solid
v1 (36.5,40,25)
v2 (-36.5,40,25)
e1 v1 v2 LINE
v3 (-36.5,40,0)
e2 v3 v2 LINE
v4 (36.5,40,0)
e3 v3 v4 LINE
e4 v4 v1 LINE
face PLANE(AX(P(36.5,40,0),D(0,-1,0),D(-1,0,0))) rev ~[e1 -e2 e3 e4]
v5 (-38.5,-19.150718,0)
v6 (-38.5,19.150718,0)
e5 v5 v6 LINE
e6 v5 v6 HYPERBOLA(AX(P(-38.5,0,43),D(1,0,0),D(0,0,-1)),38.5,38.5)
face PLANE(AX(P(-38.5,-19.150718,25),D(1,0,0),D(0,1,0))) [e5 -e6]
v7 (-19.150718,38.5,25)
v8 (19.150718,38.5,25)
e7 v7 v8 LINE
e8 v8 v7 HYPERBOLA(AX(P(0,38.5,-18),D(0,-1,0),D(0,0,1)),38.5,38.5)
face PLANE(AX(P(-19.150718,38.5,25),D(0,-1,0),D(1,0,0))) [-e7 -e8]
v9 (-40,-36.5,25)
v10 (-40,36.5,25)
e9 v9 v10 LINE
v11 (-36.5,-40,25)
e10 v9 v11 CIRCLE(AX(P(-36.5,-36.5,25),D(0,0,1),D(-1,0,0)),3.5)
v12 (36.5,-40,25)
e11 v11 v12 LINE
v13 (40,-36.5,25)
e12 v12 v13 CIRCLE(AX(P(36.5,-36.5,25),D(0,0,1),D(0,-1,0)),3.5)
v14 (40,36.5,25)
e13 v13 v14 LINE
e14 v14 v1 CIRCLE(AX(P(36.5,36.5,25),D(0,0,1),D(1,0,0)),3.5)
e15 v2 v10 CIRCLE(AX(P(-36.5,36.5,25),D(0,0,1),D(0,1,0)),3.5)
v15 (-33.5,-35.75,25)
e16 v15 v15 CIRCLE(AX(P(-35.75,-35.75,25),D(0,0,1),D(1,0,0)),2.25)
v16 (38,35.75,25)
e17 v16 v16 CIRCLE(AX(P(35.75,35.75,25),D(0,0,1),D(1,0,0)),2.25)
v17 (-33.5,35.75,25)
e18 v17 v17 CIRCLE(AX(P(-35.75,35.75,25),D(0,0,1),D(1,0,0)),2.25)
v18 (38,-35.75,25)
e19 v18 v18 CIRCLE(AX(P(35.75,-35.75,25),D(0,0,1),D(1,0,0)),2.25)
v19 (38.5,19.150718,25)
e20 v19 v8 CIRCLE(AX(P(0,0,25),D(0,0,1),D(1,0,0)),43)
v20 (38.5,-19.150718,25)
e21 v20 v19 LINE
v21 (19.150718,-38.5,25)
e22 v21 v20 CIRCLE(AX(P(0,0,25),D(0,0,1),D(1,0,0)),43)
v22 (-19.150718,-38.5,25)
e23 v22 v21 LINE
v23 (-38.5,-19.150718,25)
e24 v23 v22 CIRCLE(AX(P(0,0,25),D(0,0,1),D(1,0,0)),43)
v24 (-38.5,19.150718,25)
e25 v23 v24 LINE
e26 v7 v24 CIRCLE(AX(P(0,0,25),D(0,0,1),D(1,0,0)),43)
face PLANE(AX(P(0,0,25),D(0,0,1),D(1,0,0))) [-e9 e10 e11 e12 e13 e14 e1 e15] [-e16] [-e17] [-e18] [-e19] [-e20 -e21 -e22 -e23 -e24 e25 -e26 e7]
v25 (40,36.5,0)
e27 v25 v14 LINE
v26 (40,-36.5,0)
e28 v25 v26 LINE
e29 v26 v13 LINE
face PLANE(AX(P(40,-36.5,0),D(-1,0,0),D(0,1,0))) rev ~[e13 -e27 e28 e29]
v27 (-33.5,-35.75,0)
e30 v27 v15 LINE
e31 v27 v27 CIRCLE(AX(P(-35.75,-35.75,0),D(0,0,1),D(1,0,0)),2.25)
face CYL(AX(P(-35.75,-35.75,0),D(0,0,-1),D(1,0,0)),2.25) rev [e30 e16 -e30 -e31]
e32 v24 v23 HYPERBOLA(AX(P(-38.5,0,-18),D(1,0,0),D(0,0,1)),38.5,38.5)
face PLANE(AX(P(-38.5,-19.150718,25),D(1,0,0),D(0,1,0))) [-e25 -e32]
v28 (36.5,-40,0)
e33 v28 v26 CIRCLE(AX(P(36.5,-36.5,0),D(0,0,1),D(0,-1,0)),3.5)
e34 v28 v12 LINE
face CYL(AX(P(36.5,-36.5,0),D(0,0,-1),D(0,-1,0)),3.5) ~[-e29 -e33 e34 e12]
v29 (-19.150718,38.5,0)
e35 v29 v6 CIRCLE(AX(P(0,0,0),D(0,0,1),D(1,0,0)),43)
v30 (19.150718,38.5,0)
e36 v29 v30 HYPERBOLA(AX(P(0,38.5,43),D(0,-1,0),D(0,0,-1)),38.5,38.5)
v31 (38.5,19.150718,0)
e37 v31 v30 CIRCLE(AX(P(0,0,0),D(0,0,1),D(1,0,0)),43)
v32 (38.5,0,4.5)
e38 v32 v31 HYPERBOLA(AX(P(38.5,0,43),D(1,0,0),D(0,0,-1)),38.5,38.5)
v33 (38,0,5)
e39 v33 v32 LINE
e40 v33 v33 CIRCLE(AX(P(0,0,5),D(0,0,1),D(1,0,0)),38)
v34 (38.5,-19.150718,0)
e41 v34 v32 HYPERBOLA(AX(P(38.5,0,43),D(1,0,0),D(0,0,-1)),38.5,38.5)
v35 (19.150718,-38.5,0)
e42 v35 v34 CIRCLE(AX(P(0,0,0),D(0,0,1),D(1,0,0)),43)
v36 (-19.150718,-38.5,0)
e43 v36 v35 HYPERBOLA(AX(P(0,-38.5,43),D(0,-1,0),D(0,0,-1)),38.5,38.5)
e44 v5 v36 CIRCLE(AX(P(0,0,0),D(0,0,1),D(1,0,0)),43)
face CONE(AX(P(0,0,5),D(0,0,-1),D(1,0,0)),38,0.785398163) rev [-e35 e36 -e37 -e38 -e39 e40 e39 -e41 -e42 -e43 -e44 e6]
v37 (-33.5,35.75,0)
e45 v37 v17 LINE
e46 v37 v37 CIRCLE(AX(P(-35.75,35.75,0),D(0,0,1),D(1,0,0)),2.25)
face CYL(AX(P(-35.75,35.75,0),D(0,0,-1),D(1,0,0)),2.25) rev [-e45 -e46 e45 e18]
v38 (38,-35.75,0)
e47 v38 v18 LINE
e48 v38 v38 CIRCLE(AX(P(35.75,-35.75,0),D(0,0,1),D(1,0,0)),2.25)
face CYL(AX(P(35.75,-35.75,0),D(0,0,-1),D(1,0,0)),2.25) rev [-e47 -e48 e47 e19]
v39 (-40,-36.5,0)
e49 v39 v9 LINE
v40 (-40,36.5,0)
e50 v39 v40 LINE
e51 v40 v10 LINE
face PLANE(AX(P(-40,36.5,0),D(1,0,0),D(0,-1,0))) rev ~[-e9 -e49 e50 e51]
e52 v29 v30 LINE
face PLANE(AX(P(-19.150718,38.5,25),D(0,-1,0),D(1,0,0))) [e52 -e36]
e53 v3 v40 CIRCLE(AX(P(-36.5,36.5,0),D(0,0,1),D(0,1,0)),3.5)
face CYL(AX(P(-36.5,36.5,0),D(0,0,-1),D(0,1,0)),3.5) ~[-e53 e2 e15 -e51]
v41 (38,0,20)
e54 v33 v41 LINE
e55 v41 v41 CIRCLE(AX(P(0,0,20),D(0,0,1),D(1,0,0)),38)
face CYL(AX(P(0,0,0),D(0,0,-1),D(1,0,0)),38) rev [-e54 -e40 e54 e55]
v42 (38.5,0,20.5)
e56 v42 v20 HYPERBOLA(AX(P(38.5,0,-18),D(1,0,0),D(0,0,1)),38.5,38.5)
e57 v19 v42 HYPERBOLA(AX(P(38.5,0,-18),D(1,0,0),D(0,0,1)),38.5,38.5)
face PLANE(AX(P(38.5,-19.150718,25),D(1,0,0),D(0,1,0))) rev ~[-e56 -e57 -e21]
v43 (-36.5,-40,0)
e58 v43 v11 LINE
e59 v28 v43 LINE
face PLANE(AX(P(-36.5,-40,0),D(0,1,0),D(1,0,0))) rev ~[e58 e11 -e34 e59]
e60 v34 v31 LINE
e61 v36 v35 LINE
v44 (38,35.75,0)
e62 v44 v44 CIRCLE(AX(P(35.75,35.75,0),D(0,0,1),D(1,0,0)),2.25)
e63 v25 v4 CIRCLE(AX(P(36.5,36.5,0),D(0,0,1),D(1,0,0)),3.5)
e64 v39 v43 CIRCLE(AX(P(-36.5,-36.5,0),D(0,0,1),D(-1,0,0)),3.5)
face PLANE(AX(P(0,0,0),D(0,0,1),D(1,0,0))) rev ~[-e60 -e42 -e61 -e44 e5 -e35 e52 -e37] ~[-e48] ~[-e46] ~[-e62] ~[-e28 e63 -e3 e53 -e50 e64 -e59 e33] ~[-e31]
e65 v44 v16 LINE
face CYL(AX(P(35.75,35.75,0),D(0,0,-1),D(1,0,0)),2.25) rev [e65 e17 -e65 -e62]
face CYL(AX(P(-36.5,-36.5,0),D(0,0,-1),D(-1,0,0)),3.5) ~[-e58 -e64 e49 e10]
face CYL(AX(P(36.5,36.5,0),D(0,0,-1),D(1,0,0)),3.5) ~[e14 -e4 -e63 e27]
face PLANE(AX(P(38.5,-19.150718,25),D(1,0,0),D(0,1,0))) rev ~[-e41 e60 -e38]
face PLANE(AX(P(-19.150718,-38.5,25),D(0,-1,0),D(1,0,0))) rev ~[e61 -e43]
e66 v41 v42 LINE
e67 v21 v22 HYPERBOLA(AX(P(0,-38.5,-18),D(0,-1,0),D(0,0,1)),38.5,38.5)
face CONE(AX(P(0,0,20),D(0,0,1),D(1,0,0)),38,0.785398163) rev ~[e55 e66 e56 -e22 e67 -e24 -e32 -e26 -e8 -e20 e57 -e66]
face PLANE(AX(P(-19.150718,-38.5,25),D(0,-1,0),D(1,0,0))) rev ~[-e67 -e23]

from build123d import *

# Parameters (mm, degrees)
F0_R     = 2.25
F0_R_2   = 38
F1_DEPTH = 25
F3_W     = 1.5
F3_H     = 38.3014360044
F3_W_2   = 38.3014360044
F3_H_2   = 1.5
F4_DEPTH = 25


# Not quite as in the source:
# - a fillet or chamfer that OpenCascade refuses, or shapes differently, is made with other operations: its cross-section is extruded or revolved along the edge and cut away or added


with BuildPart() as f1:
    # F0 (on Top) → F1 (new body)
    with BuildSketch(Plane.XY):
        with BuildLine():
            Line((-36.5, -40), (36.5, -40))
            ThreePointArc((36.5, -40), (38.9748737342, -38.9748737342), (40, -36.5))
            Line((40, -36.5), (40, 36.5))
            ThreePointArc((40, 36.5), (38.9748737342, 38.9748737342), (36.5, 40))
            Line((36.5, 40), (-36.5, 40))
            ThreePointArc((-36.5, 40), (-38.9748737342, 38.9748737342), (-40, 36.5))
            Line((-40, 36.5), (-40, -36.5))
            ThreePointArc((-40, -36.5), (-38.9748737342, -38.9748737342), (-36.5, -40))
        make_face()
        with Locations((-35.75, -35.75)):
            Circle(F0_R, mode=Mode.SUBTRACT)
        with Locations((35.75, -35.75)):
            Circle(F0_R, mode=Mode.SUBTRACT)
        with Locations((-35.75, 35.75)):
            Circle(F0_R, mode=Mode.SUBTRACT)
        Circle(F0_R_2, mode=Mode.SUBTRACT)
        with Locations((35.75, 35.75)):
            Circle(F0_R, mode=Mode.SUBTRACT)
    extrude(amount=F1_DEPTH)

    # F2: chamfer of 5 on 2 edges, made by hand

    # F2_s1 → F2_t2 (revolve, cut)
    with BuildSketch(Plane.XZ):
        Polygon((38, 20), (43, 25), (38, 25), align=None)
    revolve(axis=Axis((0, 0, 25), (0, 0, 1)), mode=Mode.SUBTRACT)

    # F2_s3 → F2_t4 (revolve, cut)
    with BuildSketch(Plane.XZ):
        Polygon((38, 5), (43, 0), (38, 0), align=None)
    revolve(axis=Axis((0, 0, 0), (0, 0, 1)), mode=Mode.SUBTRACT)

    # F3 (on face) → F4 (join, through all)
    with BuildSketch(Plane.XY.offset(25)):
        with Locations((-39.25, 0)):
            Rectangle(F3_W, F3_H)
        with Locations((0, -39.25)):
            Rectangle(F3_W_2, F3_H_2)
        with Locations((39.25, 0)):
            Rectangle(F3_W, F3_H)
        with Locations((0, 39.25)):
            Rectangle(F3_W_2, F3_H_2)
    extrude(amount=-F4_DEPTH)


solid = f1.part
